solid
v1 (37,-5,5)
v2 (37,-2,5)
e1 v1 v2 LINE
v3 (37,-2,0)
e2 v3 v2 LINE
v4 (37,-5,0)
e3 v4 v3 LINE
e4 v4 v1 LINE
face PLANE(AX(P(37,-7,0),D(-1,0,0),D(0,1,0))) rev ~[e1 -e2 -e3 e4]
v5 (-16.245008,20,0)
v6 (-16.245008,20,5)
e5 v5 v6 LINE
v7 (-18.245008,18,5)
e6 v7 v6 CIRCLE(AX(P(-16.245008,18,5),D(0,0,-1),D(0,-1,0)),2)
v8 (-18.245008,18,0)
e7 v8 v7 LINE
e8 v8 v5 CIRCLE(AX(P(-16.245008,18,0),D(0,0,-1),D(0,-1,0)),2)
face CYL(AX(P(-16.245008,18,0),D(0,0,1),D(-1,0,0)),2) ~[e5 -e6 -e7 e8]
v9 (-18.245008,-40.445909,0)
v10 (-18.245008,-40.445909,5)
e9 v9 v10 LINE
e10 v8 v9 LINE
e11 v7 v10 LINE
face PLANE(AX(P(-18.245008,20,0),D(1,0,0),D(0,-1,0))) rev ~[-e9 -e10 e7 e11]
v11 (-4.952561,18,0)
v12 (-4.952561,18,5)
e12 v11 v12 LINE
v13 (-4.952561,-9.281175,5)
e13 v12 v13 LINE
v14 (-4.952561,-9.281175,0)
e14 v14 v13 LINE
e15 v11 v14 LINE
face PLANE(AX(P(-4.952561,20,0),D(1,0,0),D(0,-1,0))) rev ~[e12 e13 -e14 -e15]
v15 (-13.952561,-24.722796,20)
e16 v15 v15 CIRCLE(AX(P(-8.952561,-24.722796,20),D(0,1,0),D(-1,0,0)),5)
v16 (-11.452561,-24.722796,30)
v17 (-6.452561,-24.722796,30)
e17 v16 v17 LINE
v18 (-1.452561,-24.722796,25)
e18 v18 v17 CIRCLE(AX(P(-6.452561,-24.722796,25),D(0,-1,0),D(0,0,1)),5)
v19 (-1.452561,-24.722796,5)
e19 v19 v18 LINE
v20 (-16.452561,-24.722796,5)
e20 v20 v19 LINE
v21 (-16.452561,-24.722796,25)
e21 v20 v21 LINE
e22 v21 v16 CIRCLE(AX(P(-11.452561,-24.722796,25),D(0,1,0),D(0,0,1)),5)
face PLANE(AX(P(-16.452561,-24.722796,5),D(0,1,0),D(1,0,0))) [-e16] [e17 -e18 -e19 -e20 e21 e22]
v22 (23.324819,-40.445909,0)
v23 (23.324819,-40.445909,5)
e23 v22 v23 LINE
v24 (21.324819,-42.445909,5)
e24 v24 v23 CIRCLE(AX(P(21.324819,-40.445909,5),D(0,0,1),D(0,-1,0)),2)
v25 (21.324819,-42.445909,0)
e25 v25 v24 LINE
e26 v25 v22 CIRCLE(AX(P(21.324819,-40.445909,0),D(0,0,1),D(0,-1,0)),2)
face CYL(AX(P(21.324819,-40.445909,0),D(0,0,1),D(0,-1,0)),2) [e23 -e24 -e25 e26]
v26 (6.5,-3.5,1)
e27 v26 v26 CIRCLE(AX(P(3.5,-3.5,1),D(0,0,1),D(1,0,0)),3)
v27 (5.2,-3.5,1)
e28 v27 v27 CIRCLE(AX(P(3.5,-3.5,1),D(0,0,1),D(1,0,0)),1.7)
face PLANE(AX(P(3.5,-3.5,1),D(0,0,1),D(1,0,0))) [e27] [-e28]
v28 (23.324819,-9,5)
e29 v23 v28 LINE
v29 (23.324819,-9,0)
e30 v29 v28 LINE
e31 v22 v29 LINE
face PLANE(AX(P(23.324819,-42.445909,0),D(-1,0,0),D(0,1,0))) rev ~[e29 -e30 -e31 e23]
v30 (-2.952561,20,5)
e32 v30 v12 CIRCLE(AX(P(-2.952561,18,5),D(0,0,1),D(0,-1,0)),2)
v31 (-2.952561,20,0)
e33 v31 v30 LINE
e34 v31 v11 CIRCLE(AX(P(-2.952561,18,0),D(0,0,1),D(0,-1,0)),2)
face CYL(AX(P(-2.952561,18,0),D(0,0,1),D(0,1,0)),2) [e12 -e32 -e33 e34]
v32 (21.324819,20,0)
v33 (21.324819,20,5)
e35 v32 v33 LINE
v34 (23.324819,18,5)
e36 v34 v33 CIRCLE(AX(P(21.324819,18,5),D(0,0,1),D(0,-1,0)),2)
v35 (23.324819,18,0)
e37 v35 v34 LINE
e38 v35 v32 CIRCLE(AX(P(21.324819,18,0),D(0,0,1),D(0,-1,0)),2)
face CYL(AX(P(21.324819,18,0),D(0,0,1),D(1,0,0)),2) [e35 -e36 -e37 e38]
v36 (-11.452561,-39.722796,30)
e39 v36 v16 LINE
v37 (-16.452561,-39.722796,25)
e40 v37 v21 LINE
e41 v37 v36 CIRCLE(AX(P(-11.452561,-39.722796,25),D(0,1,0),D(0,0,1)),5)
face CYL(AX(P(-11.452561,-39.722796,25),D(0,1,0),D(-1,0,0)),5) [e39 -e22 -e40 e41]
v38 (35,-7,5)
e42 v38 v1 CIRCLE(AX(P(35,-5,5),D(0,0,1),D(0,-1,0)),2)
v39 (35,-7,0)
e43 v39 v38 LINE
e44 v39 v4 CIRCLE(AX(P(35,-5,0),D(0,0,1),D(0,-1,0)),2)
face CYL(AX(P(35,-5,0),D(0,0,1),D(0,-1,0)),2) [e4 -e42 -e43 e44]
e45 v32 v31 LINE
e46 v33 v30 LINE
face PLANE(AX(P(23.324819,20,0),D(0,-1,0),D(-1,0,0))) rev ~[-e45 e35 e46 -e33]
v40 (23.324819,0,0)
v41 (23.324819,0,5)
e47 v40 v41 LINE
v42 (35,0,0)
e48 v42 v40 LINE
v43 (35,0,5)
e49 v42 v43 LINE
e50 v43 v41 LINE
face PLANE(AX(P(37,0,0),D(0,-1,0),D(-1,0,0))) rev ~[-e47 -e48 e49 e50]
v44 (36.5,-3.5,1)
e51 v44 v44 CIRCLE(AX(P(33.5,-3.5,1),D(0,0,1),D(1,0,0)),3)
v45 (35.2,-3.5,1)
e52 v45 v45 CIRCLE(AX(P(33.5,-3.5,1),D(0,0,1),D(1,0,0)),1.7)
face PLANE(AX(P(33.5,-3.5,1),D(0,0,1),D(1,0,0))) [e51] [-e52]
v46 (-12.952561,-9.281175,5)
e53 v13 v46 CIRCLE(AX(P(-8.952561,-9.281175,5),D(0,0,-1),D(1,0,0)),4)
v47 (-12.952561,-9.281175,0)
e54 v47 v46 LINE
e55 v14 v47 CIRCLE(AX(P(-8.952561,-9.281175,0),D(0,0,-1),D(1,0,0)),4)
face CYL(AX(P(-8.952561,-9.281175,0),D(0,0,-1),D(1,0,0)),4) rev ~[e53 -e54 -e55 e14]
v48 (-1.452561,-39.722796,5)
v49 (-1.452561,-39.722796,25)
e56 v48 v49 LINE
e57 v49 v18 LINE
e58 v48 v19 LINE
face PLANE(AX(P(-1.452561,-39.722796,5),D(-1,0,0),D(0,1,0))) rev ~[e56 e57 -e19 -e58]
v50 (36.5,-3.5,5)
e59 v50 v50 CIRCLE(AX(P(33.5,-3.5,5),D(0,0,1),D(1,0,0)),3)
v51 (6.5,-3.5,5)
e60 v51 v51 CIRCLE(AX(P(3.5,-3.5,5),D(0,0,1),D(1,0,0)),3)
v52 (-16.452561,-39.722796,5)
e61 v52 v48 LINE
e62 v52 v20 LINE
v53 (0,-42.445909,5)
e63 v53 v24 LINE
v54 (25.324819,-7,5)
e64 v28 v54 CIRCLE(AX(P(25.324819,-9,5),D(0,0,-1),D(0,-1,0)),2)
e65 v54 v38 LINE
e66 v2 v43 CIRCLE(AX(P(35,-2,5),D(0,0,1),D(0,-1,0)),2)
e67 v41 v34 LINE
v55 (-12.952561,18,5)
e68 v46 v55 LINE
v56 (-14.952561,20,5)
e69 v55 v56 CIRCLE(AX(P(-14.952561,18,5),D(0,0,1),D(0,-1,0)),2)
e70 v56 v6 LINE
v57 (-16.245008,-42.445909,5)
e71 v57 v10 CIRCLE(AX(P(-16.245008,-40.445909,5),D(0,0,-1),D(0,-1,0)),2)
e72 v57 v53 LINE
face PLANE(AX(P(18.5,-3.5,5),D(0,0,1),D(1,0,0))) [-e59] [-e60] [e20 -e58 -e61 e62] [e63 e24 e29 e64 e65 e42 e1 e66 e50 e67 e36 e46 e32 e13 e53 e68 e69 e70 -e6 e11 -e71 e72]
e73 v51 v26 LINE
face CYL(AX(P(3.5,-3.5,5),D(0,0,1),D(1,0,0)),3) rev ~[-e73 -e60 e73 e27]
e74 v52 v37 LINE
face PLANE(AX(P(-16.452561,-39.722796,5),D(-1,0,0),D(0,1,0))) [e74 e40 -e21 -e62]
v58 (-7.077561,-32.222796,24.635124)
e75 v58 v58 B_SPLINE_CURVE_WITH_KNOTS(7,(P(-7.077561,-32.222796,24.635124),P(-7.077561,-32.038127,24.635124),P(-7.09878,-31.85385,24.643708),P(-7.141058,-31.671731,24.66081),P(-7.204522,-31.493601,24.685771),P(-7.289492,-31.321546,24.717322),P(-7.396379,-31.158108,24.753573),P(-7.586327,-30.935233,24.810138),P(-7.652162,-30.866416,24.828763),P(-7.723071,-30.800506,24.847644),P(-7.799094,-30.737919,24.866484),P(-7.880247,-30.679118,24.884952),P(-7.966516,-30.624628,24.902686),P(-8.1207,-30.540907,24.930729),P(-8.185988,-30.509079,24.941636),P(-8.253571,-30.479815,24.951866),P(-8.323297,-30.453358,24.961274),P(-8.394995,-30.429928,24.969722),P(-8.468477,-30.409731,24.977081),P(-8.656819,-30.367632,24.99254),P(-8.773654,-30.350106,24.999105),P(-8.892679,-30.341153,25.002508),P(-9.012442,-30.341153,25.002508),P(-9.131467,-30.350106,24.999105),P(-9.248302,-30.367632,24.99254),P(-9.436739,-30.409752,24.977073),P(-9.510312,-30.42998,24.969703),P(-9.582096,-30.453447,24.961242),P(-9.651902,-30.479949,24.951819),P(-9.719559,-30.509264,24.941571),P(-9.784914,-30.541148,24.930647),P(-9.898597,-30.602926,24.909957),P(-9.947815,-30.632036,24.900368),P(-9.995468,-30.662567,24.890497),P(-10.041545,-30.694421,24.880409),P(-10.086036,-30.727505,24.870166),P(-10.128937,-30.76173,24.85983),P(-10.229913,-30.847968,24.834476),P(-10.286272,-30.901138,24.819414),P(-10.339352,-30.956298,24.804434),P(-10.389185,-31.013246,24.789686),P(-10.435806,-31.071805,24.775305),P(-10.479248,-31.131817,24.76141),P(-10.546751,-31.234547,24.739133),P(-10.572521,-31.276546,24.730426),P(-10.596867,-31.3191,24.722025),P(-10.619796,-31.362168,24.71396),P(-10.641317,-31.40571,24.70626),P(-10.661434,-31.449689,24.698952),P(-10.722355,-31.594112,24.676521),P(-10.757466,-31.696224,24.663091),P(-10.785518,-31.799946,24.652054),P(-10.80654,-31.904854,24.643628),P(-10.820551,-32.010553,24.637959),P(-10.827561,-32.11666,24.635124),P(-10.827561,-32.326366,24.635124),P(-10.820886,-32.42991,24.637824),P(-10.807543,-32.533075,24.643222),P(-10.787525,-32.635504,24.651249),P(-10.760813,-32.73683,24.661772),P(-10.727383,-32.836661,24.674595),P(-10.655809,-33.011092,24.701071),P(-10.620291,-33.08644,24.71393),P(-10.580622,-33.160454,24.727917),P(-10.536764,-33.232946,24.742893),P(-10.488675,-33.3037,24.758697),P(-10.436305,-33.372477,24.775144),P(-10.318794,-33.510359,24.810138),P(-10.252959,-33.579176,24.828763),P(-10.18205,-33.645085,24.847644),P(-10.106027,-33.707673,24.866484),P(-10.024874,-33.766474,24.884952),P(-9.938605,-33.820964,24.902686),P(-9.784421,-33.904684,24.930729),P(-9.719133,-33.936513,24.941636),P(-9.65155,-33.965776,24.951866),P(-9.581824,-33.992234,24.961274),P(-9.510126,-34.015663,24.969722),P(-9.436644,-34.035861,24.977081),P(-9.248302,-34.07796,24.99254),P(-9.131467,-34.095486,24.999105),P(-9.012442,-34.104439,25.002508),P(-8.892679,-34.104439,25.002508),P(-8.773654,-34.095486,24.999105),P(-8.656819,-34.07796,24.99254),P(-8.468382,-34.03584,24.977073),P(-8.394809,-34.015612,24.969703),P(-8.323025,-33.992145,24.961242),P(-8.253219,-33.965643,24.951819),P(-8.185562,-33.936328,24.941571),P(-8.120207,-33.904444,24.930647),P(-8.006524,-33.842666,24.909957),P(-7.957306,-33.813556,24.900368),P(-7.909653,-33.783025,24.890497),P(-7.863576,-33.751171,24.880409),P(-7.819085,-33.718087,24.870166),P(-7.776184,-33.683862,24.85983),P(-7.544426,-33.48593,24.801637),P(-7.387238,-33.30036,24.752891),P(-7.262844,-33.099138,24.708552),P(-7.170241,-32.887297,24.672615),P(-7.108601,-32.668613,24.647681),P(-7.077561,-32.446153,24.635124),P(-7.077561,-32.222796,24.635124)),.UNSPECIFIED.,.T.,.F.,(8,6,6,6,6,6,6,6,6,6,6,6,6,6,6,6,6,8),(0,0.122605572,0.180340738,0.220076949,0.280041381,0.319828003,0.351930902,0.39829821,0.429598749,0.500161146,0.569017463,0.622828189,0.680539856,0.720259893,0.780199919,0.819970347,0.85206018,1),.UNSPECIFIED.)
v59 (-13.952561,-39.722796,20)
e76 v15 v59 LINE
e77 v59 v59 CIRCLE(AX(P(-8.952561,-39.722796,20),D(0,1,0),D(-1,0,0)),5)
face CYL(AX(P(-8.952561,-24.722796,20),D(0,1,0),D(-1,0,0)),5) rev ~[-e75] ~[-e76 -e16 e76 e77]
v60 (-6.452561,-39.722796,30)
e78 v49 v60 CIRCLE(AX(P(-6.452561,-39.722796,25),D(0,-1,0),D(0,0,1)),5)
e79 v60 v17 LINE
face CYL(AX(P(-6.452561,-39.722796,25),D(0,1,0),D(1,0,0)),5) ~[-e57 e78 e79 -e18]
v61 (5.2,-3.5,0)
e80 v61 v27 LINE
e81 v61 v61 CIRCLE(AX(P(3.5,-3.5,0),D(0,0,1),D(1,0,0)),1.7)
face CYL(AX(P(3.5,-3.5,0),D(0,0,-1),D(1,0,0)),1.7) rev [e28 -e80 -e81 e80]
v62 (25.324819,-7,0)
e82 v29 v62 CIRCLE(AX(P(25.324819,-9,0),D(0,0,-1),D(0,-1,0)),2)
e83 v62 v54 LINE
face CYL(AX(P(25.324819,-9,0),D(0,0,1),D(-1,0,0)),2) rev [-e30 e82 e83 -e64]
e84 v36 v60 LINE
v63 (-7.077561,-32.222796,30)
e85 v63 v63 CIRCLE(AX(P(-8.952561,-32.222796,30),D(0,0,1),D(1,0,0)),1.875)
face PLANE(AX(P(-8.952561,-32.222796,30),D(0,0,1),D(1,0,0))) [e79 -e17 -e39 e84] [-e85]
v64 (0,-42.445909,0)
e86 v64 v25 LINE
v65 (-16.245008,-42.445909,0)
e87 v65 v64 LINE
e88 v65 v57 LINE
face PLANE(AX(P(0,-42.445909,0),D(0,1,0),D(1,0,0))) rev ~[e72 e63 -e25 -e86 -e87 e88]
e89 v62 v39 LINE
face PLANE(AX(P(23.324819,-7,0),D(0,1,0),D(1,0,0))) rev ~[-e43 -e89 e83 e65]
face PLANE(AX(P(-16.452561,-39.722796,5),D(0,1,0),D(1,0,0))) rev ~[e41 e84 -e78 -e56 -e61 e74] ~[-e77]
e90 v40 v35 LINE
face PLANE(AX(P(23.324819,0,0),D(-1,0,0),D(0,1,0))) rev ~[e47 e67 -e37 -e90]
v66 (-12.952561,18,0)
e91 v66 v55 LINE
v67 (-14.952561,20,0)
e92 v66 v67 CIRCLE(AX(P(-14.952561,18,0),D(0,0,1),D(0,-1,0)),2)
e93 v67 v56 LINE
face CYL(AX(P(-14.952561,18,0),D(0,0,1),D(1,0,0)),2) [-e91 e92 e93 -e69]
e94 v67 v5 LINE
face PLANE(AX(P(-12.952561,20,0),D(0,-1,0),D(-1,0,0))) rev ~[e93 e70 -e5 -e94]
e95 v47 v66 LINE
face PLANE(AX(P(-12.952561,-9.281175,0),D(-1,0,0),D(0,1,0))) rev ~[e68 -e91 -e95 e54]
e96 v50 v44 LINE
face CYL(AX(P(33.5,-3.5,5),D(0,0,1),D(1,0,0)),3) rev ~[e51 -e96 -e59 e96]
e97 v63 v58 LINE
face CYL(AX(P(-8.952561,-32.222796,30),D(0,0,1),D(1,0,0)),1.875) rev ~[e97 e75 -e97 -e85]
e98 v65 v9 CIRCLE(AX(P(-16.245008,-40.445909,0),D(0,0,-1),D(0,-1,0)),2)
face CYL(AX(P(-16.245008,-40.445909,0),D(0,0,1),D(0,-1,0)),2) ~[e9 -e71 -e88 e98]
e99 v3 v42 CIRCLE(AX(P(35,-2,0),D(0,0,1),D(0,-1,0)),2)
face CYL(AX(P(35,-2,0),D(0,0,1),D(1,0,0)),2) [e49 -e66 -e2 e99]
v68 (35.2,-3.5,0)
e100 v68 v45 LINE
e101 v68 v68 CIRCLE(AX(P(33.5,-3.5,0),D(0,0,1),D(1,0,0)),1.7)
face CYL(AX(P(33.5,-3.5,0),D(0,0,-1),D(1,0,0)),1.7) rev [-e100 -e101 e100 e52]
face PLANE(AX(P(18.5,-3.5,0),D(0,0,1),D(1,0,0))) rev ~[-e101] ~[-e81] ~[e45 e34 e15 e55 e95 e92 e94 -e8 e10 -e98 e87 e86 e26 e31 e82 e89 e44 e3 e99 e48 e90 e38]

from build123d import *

# Parameters (mm, degrees)
F0_R      = 1.7
F0_W      = 23.3248192817
F0_H      = 35.4459092319
F0_H_2    = 20
F1_DEPTH  = 5
F2_R      = 3
F2_R_2    = 1.7
F3_DEPTH  = 4
F4_W      = 15
F4_H      = 15
F5_DEPTH  = 25
F6_R      = 5
F7_DEPTH  = 15
F8_R      = 2
F9_R      = 1.875
F10_DEPTH = 7
F11_R     = 5


with BuildPart() as f1:
    # F0 (on Top) → F1 (new body)
    with BuildSketch(Plane.XY):
        Polygon((23.3248192817, 0), (0, 0), (0, -7), (23.3248192817, -7), (37, -7), (37, 0), align=None)
        with Locations((3.5, -3.5)):
            Circle(F0_R, mode=Mode.SUBTRACT)
        with Locations((33.5, -3.5)):
            Circle(F0_R, mode=Mode.SUBTRACT)
        with Locations((11.6624096408, -24.722954616)):
            Rectangle(F0_W, F0_H)
        with Locations((11.6624096408, 10)):
            Rectangle(F0_W, F0_H_2)
        with BuildLine():
            Line((0, -7), (0, 0))
            Line((0, 0), (0, 20))
            Line((0, 20), (-4.9525605589, 20))
            Line((-4.9525605589, 20), (-4.9525605589, -9.2811752111))
            ThreePointArc((-4.9525605589, -9.2811752111), (-8.9525605589, -13.2811752111), (-12.9525605589, -9.2811752111))
            Line((-12.9525605589, -9.2811752111), (-12.9525605589, 20))
            Line((-12.9525605589, 20), (-18.2450078428, 20))
            Line((-18.2450078428, 20), (-18.2450078428, -42.4459092319))
            Line((-18.2450078428, -42.4459092319), (0, -42.4459092319))
            Line((0, -42.4459092319), (0, -7))
        make_face()
    extrude(amount=F1_DEPTH)

    # F2 (on face) → F3 (cut)
    with BuildSketch(Plane.XY.offset(5)):
        with Locations((3.5, -3.5)):
            Circle(F2_R)
        with Locations((3.5, -3.5)):
            Circle(F2_R_2, mode=Mode.SUBTRACT)
        with Locations((33.5, -3.5)):
            Circle(F2_R)
        with Locations((33.5, -3.5)):
            Circle(F2_R_2, mode=Mode.SUBTRACT)
    extrude(amount=-F3_DEPTH, mode=Mode.SUBTRACT)

    # F4 (on face) → F5 (join)
    with BuildSketch(Plane.XY.offset(5)):
        with Locations((-8.9525605589, -32.2227959335)):
            Rectangle(F4_W, F4_H)
    extrude(amount=F5_DEPTH)

    # F6 (on face) → F7 (cut)
    with BuildSketch(Plane(origin=(0, -24.7227959335, 0), x_dir=(-1, 0, 0), z_dir=(0, 1, 0))):
        with Locations((8.9525605589, 20)):
            Circle(F6_R)
    extrude(amount=-F7_DEPTH, mode=Mode.SUBTRACT)

    # F8
    f8_edges = [f1.edges().sort_by_distance(p)[0] for p in [
        (23.324819, 20, 2.5),
        (37, 0, 2.5),
        (37, -7, 2.5),
        (23.324819, -42.445909, 2.5),
        (-18.245008, 20, 2.5),
        (-18.245008, -42.445909, 2.5),
        (23.324819, -7, 2.5),
        (-4.952561, 20, 2.5),
        (-12.952561, 20, 2.5),
    ]]
    fillet(f8_edges, radius=F8_R)

    # F9 (on face) → F10 (cut)
    with BuildSketch(Plane.XY.offset(30)):
        with Locations((-8.9525605589, -32.2227959335)):
            Circle(F9_R)
    extrude(amount=-F10_DEPTH, mode=Mode.SUBTRACT)

    # F11
    f11_edges = [f1.edges().sort_by_distance(p)[0] for p in [
        (-1.452561, -32.222796, 30),
        (-16.452561, -32.222796, 30),
    ]]
    fillet(f11_edges, radius=F11_R)


solid = f1.part
